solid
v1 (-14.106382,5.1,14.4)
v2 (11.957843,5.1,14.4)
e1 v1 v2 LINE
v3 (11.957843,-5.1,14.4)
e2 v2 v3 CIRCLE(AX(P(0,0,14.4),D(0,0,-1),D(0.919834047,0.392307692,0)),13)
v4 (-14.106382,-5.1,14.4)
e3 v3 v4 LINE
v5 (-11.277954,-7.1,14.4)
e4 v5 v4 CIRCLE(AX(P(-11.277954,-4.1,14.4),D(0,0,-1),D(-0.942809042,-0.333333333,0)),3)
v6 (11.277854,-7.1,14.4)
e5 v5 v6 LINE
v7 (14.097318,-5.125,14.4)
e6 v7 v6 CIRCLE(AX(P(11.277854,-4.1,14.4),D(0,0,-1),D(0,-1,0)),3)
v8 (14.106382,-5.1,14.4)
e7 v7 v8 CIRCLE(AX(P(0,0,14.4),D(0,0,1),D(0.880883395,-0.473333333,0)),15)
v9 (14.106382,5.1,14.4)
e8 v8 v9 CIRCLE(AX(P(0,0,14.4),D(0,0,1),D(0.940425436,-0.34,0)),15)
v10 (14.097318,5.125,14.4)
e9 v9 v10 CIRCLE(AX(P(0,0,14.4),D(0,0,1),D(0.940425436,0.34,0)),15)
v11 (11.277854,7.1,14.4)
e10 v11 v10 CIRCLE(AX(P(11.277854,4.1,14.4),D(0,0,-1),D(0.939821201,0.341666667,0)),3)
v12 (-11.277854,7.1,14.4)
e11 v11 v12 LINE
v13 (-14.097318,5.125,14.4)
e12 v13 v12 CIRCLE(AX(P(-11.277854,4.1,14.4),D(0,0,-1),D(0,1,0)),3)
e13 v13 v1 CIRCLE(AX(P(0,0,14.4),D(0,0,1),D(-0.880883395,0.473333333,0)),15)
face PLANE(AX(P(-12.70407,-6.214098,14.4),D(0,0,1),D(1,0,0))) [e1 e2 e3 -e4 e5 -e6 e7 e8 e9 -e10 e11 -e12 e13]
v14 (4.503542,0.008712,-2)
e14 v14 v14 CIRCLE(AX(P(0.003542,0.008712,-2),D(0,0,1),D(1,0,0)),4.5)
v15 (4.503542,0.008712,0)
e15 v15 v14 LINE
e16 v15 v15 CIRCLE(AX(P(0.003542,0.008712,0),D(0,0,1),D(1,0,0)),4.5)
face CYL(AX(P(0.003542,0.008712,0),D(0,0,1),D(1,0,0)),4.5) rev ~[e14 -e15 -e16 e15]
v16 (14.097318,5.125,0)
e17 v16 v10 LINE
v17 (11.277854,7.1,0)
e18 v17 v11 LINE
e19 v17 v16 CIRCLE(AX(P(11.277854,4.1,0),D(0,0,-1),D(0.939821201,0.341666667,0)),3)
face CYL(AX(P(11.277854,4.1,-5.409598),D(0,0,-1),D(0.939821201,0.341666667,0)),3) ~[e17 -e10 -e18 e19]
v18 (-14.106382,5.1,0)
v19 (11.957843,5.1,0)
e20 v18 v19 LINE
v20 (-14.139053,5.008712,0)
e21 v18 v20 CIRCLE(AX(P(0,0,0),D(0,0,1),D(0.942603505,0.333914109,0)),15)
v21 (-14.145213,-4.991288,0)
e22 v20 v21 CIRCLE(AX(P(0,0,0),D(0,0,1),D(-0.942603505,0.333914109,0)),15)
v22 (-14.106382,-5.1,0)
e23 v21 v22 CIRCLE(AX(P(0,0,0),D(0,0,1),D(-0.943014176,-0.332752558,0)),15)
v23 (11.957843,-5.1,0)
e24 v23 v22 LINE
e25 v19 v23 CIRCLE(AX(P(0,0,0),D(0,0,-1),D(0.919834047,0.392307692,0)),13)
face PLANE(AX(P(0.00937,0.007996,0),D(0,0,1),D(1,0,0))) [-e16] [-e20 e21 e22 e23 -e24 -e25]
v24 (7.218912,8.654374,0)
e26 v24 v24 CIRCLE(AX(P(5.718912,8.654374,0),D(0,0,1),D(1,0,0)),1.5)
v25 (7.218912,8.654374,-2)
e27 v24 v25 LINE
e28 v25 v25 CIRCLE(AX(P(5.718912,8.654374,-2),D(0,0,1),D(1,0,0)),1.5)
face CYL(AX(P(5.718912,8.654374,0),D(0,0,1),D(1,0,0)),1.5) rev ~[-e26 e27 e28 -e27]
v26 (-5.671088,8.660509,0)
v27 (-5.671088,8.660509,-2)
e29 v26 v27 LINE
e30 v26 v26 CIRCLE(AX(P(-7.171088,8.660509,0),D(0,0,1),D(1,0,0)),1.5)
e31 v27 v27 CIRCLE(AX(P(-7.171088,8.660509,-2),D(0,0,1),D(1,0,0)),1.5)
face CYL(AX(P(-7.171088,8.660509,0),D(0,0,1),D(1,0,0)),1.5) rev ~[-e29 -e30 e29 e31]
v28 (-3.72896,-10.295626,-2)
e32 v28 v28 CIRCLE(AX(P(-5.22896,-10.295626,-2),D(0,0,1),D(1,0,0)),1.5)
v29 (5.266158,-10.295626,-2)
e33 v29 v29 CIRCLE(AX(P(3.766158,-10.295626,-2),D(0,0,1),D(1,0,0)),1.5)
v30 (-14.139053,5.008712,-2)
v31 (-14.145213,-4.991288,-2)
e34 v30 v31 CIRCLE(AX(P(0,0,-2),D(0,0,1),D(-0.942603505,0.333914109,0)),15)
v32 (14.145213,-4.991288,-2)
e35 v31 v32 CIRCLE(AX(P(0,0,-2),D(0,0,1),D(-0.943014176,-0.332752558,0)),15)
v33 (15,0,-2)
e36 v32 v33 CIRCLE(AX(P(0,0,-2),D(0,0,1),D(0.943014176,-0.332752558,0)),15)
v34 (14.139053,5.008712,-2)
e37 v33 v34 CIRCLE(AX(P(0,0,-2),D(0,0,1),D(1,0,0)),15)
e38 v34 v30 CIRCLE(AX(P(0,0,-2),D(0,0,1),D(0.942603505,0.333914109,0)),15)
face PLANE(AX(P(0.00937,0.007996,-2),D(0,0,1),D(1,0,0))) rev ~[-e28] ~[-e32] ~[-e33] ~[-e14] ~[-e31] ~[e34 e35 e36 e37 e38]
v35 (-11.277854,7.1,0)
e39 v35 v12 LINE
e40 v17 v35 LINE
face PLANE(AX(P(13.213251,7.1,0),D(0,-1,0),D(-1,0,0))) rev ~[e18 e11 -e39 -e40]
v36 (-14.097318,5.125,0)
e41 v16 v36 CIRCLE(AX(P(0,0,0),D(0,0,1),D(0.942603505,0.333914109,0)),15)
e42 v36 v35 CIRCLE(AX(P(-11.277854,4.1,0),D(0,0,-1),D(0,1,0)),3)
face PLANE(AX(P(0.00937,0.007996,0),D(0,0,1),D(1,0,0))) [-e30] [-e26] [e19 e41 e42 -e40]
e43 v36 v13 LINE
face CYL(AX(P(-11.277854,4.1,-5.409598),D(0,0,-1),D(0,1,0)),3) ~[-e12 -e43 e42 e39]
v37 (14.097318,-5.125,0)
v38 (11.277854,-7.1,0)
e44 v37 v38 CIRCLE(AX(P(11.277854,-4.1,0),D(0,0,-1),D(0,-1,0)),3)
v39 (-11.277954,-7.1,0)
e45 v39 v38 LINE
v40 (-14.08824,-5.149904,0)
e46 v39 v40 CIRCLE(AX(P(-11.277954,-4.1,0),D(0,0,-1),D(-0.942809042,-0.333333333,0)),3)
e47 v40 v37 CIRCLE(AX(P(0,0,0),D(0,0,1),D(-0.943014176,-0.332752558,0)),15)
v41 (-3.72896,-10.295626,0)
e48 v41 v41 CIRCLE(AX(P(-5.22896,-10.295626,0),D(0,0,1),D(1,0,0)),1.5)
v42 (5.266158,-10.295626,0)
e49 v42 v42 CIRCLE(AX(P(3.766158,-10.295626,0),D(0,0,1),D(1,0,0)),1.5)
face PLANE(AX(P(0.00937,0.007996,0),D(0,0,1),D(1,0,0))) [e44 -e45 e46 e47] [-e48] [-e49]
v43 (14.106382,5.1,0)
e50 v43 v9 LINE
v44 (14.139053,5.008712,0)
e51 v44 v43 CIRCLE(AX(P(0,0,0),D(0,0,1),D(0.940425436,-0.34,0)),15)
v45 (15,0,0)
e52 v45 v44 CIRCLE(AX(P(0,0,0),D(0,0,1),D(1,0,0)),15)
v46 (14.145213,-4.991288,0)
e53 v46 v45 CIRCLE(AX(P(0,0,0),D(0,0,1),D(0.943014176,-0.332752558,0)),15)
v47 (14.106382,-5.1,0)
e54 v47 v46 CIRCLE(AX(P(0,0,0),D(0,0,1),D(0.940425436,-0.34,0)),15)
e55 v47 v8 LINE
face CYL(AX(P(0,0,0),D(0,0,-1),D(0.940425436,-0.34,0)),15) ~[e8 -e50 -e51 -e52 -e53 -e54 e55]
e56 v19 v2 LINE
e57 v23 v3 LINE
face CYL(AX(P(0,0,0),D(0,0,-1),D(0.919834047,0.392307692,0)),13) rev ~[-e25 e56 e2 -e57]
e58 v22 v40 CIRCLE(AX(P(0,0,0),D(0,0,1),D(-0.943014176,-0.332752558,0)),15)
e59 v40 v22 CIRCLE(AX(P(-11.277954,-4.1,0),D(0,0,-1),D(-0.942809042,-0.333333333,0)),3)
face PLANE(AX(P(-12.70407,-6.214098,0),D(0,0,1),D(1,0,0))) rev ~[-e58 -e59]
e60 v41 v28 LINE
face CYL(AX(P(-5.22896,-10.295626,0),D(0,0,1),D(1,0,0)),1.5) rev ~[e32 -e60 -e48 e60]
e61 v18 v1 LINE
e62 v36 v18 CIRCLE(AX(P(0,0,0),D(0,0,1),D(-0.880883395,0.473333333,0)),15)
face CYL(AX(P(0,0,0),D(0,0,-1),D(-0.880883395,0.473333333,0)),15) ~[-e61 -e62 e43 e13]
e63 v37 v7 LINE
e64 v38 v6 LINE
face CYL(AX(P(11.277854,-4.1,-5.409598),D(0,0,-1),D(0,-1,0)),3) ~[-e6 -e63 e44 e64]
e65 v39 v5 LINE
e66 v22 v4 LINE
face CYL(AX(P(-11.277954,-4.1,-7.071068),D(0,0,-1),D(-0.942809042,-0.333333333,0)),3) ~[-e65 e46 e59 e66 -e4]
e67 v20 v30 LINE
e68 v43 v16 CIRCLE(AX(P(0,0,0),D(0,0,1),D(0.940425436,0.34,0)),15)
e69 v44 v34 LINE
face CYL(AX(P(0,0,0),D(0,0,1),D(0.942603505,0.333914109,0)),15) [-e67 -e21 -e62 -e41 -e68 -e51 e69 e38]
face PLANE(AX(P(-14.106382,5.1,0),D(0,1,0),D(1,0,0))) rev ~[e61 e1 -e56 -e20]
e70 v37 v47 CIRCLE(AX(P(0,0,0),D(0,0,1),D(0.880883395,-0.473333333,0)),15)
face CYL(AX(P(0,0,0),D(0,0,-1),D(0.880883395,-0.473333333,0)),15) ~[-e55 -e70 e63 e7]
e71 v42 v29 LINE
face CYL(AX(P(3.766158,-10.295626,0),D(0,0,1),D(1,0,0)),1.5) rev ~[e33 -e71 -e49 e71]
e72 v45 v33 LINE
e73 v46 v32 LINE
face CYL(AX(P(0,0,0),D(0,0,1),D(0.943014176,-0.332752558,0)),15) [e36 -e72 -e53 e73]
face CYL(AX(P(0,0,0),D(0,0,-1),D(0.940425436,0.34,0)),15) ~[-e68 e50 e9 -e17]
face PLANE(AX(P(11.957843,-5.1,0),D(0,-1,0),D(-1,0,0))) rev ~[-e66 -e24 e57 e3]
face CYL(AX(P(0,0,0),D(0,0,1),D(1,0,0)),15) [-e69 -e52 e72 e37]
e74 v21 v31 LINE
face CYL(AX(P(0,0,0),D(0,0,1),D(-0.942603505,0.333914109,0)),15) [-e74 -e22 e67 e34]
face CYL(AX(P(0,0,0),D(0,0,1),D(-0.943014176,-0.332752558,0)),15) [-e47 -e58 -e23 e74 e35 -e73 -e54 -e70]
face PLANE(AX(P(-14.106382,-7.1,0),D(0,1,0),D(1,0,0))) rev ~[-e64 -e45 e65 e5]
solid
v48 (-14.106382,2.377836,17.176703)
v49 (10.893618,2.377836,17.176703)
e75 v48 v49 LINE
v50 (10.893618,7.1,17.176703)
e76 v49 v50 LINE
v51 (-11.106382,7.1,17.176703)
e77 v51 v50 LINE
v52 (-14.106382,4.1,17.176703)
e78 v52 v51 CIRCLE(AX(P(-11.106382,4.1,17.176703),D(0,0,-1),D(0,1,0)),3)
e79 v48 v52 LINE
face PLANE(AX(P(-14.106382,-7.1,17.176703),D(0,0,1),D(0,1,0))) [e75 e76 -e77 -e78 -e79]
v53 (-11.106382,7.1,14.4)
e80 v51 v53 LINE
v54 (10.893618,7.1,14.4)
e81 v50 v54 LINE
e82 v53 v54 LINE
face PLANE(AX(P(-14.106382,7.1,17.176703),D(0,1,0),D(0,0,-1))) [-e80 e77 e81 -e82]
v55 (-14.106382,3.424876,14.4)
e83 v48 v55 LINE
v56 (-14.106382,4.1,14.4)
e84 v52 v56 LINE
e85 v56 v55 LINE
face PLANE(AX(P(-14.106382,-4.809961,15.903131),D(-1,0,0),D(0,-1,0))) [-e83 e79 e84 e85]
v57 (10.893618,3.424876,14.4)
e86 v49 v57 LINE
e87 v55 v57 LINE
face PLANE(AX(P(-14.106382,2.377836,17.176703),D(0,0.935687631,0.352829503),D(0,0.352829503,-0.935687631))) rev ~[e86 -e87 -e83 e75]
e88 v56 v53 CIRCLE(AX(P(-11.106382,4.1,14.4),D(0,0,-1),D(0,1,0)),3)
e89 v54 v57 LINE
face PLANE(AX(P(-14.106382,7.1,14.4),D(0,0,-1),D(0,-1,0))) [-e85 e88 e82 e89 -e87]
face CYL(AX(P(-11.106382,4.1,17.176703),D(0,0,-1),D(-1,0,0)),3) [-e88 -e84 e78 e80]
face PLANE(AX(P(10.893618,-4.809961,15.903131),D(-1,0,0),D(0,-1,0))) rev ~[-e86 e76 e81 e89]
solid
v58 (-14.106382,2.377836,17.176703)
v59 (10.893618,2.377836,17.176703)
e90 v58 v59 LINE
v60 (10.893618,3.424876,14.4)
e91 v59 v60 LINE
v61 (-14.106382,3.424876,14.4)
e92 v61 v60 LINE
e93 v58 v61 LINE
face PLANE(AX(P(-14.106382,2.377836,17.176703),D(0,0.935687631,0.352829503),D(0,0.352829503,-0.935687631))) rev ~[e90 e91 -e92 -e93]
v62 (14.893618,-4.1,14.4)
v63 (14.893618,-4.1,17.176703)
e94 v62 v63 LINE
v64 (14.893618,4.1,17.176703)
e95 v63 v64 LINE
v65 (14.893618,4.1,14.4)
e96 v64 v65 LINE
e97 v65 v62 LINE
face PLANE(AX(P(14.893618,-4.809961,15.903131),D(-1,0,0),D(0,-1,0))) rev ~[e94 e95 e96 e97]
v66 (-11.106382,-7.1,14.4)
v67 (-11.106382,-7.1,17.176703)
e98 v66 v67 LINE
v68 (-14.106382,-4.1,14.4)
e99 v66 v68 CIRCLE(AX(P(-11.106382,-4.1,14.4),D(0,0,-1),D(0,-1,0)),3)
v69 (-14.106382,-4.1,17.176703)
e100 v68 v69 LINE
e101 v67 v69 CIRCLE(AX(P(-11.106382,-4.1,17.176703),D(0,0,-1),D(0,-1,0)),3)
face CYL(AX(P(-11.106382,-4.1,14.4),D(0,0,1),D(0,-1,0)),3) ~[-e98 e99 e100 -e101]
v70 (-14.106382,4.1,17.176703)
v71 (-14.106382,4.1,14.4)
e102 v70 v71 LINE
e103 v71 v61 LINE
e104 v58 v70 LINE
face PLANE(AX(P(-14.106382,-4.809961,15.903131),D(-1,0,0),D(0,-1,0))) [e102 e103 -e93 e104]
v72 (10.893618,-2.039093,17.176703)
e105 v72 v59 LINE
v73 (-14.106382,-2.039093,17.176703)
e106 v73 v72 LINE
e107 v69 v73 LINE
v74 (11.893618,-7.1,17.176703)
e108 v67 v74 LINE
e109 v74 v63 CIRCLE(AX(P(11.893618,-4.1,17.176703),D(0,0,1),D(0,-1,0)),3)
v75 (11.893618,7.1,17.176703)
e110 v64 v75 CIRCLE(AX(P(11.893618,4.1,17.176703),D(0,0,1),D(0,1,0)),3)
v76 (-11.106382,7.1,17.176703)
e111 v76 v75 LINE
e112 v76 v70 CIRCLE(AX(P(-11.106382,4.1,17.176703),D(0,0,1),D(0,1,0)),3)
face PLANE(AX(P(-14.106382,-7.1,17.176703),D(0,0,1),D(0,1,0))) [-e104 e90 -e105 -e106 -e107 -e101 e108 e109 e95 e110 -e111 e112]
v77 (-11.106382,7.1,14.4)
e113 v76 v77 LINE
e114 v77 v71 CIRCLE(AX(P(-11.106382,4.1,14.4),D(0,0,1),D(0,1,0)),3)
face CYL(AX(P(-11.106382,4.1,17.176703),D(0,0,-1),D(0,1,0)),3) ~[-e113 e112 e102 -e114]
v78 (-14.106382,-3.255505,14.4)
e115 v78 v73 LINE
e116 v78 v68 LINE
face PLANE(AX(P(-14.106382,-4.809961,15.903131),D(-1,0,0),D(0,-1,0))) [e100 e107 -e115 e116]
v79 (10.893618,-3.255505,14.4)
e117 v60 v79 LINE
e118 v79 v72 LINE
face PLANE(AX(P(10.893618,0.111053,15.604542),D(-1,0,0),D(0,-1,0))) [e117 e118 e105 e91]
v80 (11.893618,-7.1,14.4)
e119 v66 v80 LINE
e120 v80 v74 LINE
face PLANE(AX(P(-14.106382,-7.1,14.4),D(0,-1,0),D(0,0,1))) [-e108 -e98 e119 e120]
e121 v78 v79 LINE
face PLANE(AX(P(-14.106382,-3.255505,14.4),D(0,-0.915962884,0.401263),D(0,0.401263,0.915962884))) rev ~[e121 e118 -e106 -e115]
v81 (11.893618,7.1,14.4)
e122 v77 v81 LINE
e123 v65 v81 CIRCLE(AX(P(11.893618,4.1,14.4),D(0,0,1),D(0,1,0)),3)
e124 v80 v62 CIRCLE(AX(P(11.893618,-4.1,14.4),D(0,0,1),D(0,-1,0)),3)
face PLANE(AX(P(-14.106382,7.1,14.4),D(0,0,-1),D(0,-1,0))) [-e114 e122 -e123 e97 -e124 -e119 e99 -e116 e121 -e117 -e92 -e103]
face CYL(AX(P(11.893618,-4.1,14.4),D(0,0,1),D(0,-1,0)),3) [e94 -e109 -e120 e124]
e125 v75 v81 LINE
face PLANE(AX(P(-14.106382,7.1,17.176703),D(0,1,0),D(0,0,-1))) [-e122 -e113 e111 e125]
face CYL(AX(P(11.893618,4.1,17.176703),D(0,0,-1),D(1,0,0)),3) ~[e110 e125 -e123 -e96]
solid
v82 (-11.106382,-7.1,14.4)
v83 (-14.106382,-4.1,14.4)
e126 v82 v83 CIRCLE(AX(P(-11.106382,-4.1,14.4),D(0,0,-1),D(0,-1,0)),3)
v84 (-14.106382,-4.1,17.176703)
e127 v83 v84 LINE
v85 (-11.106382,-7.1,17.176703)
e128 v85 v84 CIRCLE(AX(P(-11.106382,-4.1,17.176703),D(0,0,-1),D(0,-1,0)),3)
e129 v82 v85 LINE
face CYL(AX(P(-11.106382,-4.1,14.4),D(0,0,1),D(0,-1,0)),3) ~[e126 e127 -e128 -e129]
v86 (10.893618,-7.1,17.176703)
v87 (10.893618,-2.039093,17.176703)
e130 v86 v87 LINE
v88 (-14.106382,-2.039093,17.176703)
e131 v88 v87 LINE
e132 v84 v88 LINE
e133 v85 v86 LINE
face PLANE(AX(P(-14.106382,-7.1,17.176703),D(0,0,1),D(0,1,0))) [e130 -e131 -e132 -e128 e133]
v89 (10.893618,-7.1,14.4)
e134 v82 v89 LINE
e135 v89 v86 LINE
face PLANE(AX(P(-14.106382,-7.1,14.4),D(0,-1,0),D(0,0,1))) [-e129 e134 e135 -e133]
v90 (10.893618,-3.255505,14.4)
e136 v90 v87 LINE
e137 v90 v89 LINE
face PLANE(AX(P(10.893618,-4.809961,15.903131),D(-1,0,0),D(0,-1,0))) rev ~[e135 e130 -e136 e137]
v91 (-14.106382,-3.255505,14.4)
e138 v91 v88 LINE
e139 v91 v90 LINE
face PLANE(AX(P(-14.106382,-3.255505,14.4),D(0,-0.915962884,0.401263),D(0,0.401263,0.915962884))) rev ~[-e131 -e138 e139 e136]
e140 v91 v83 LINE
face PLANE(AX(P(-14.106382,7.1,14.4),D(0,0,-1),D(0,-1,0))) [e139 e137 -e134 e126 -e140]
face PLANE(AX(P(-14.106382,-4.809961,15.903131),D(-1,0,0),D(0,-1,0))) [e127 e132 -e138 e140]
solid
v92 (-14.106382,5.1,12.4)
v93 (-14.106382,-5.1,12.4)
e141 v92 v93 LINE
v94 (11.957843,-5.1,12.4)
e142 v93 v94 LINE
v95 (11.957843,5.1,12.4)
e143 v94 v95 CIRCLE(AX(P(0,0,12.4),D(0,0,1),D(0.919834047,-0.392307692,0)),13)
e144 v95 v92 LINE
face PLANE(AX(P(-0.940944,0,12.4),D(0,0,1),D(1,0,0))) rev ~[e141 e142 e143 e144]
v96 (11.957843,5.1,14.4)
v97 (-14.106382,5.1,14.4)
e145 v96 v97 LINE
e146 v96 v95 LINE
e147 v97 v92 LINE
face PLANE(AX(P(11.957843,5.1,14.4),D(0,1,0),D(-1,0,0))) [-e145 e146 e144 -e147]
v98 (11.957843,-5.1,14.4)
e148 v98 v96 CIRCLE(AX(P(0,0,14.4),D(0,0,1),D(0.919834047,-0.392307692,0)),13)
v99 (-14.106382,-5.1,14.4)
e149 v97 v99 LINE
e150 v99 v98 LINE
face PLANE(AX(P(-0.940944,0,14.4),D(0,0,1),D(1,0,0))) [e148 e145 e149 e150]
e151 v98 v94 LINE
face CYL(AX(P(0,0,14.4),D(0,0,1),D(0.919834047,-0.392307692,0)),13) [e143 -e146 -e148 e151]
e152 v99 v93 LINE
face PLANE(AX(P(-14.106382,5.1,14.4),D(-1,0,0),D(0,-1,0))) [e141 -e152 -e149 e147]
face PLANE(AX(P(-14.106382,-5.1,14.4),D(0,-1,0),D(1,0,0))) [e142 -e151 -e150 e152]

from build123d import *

# Parameters (mm, degrees)
F1_DEPTH    = 14.4
F3_DEPTH    = 2
F5_DEPTH    = 29
F6_DEPTH    = 25
F7_DEPTH    = 25
F8_T1_DEPTH = 25.219195449
F8_T3_DEPTH = 28.5421356237
F8_2_F1_R   = 3
F8_2_F2_R   = 3
F8_2_F3_R   = 3
F8_2_F4_R   = 3
F9_R        = 3
F10_R       = 4.5
F10_R_2     = 1.5
F11_DEPTH   = 2


# Not quite as in the source:
# - a fillet or chamfer that OpenCascade refuses, or shapes differently, is made with other operations: its cross-section is extruded or revolved along the edge and cut away or added
# - after a boolean that leaves OpenCascade's solid faulty, fix() repairs it


with BuildPart() as f1:
    # F0 (on Top) → F1 (new body)
    with BuildSketch(Plane.XY):
        with BuildLine():
            Line((-11.9578426148, -5.1), (-14.1063815346, -5.1))
            Line((-14.1063815346, -5.1), (-14.1063815346, -7.1))
            Line((-14.1063815346, -7.1), (-10.8899035808, -7.1))
            ThreePointArc((-10.8899035808, -7.1), (-11.4675575671, -6.123326175), (-11.9578426148, -5.1))
        make_face()
        with BuildLine():
            Line((14.1063815346, -5.1), (11.9578426148, -5.1))
            ThreePointArc((11.9578426148, -5.1), (11.4675575671, -6.123326175), (10.8899035808, -7.1))
            Line((10.8899035808, -7.1), (13.2132509247, -7.1))
            ThreePointArc((13.2132509247, -7.1), (13.6963710314, -6.1163241062), (14.1063815346, -5.1))
        make_face()
        with BuildLine():
            Line((-10.8899035808, 7.1), (-13.2132509247, 7.1))
            ThreePointArc((-13.2132509247, 7.1), (-13.6963710314, 6.1163241062), (-14.1063815346, 5.1))
            Line((-14.1063815346, 5.1), (-11.9578426148, 5.1))
            ThreePointArc((-11.9578426148, 5.1), (-11.4675575671, 6.123326175), (-10.8899035808, 7.1))
        make_face()
        with BuildLine():
            Line((13.2132509247, 7.1), (10.8899035808, 7.1))
            ThreePointArc((10.8899035808, 7.1), (11.4675575671, 6.123326175), (11.9578426148, 5.1))
            Line((11.9578426148, 5.1), (14.1063815346, 5.1))
            ThreePointArc((14.1063815346, 5.1), (13.6963710314, 6.1163241062), (13.2132509247, 7.1))
        make_face()
        with BuildLine():
            Line((11.9578426148, -5.1), (-11.9578426148, -5.1))
            ThreePointArc((-11.9578426148, -5.1), (-11.4675575671, -6.123326175), (-10.8899035808, -7.1))
            Line((-10.8899035808, -7.1), (10.8899035808, -7.1))
            ThreePointArc((10.8899035808, -7.1), (11.4675575671, -6.123326175), (11.9578426148, -5.1))
        make_face()
        with BuildLine():
            Line((14.1063815346, 5.1), (11.9578426148, 5.1))
            ThreePointArc((11.9578426148, 5.1), (13, 0), (11.9578426148, -5.1))
            Line((11.9578426148, -5.1), (14.1063815346, -5.1))
            ThreePointArc((14.1063815346, -5.1), (15, 0), (14.1063815346, 5.1))
        make_face()
        with BuildLine():
            Line((10.8899035808, 7.1), (-10.8899035808, 7.1))
            ThreePointArc((-10.8899035808, 7.1), (-11.4675575671, 6.123326175), (-11.9578426148, 5.1))
            Line((-11.9578426148, 5.1), (11.9578426148, 5.1))
            ThreePointArc((11.9578426148, 5.1), (11.4675575671, 6.123326175), (10.8899035808, 7.1))
        make_face()
    extrude(amount=F1_DEPTH)

    # F8: fillet of radius 3 on 4 edges, made by hand

    # F8_s2 → F8_t1 (cut)
    with BuildSketch(Plane.XY.offset(-5.4095977245)):
        with BuildLine():
            ThreePointArc((14.0973180073, 5.125), (12.9990458537, 6.5571324751), (11.2778544059, 7.1))
            Line((11.2778544059, 7.1), (13.2132509247, 7.1))
            ThreePointArc((13.2132509247, 7.1), (13.6909440908, 6.1284622787), (14.0973180073, 5.125))
        make_face()
        with BuildLine():
            ThreePointArc((11.2778544059, -7.1), (12.9990458537, -6.5571324751), (14.0973180073, -5.125))
            ThreePointArc((14.0973180073, -5.125), (13.6909440908, -6.1284622787), (13.2132509247, -7.1))
            Line((13.2132509247, -7.1), (11.2778544059, -7.1))
        make_face()
        with BuildLine():
            ThreePointArc((-11.2778544059, 7.1), (-12.9990458537, 6.5571324751), (-14.0973180073, 5.125))
            ThreePointArc((-14.0973180073, 5.125), (-13.6909440908, 6.1284622787), (-13.2132509247, 7.1))
            Line((-13.2132509247, 7.1), (-11.2778544059, 7.1))
        make_face()
    extrude(amount=F8_T1_DEPTH, mode=Mode.SUBTRACT)

    # F8_s4 → F8_t3 (cut)
    with BuildSketch(Plane.XY.offset(-7.0710678119)):
        with BuildLine():
            ThreePointArc((-14.1063815346, -5.1), (-13.0100052174, -6.5494897428), (-11.2779544099, -7.1))
            Line((-11.2779544099, -7.1), (-14.1063815346, -7.1))
            Line((-14.1063815346, -7.1), (-14.1063815346, -5.1))
        make_face()
    extrude(amount=F8_T3_DEPTH, mode=Mode.SUBTRACT)

    # F10 (on Top) → F11 (join)
    with BuildSketch(Plane.XY):
        with BuildLine():
            ThreePointArc((14.1452126344, -4.9912883635), (14.7847588671, -2.5319765485), (15, 0))
            ThreePointArc((15, 0), (14.7831963499, 2.5410835644), (14.1390525758, 5.0087116365))
            Line((14.1390525758, 5.0087116365), (-14.1390525758, 5.0087116365))
            ThreePointArc((-14.1390525758, 5.0087116365), (-14.999997154, 0.0092400861), (-14.1452126344, -4.9912883635))
            Line((-14.1452126344, -4.9912883635), (14.1452126344, -4.9912883635))
        make_face()
        with Locations((0.0035419917, 0.0087116365)):
            Circle(F10_R, mode=Mode.SUBTRACT)
        with BuildLine():
            Line((-14.1390525758, 5.0087116365), (14.1390525758, 5.0087116365))
            ThreePointArc((14.1390525758, 5.0087116365), (0, 15), (-14.1390525758, 5.0087116365))
        make_face()
        with Locations((-7.1710880957, 8.6605090521)):
            Circle(F10_R_2, mode=Mode.SUBTRACT)
        with Locations((5.7189119043, 8.6543741425)):
            Circle(F10_R_2, mode=Mode.SUBTRACT)
        with BuildLine():
            ThreePointArc((-14.1452126344, -4.9912883635), (0, -15), (14.1452126344, -4.9912883635))
            Line((14.1452126344, -4.9912883635), (-14.1452126344, -4.9912883635))
        make_face()
        with Locations((-5.2289596802, -10.2956258575)):
            Circle(F10_R_2, mode=Mode.SUBTRACT)
        with Locations((3.7661575137, -10.2956258575)):
            Circle(F10_R_2, mode=Mode.SUBTRACT)
    extrude(amount=-F11_DEPTH)

    add(f1.part.fix(), mode=Mode.REPLACE)


with BuildPart() as f3:
    # F2 (on face) → F3 (new body)
    with BuildSketch(Plane.XY.offset(14.4)):
        with BuildLine():
            Line((-14.1063815346, 5.1), (-14.1063815346, -5.1))
            Line((-14.1063815346, -5.1), (11.9578426148, -5.1))
            ThreePointArc((11.9578426148, -5.1), (13, 0), (11.9578426148, 5.1))
            Line((11.9578426148, 5.1), (-14.1063815346, 5.1))
        make_face()
    extrude(amount=-F3_DEPTH)


with BuildPart() as f5:
    # F4 (on face) → F5 (new body)
    with BuildSketch(Plane(origin=(-14.1063815346, 0, 0), x_dir=(0, -1, 0), z_dir=(-1, 0, 0))):
        Polygon((5.1, 14.4), (5.4331574369, 14.4), (7.1, 14.4), (7.1, 17.1767032981), (2.039092524, 17.1767032981), (3.2555045802, 14.4), align=None)
        Polygon((-4.7668425631, 14.4), (-3.4248761367, 14.4), (-2.377835637, 17.1767032981), (-7.1, 17.1767032981), (-7.1, 14.4), (-5.1, 14.4), align=None)
        Polygon((-3.4248761367, 14.4), (3.2555045802, 14.4), (2.039092524, 17.1767032981), (-2.377835637, 17.1767032981), align=None)
    extrude(amount=-F5_DEPTH)


with BuildPart() as f6:
    # F4 (on face) → F6 (new body)
    with BuildSketch(Plane(origin=(-14.1063815346, 0, 0), x_dir=(0, -1, 0), z_dir=(-1, 0, 0))):
        Polygon((3.2555045802, 14.4), (5.4331574369, 14.4), (7.1, 14.4), (7.1, 17.1767032981), (2.039092524, 17.1767032981), align=None)
        Polygon((-3.4248761367, 14.4), (3.2555045802, 14.4), (2.039092524, 17.1767032981), (-2.377835637, 17.1767032981), align=None)
        Polygon((-4.7668425631, 14.4), (-3.4248761367, 14.4), (-2.377835637, 17.1767032981), (-7.1, 17.1767032981), (-7.1, 14.4), align=None)
    extrude(amount=-F6_DEPTH)


with BuildPart() as f7_tool:
    # F4 (on face) → F7 (new body)
    with BuildSketch(Plane(origin=(-14.1063815346, 0, 0), x_dir=(0, -1, 0), z_dir=(-1, 0, 0))):
        Polygon((-3.4248761367, 14.4), (3.2555045802, 14.4), (2.039092524, 17.1767032981), (-2.377835637, 17.1767032981), align=None)
    extrude(amount=-F7_DEPTH)


with BuildPart() as f5_1:
    add(f5.part)

    # F7: cut by f7_tool
    add(f7_tool.part, mode=Mode.SUBTRACT)

    # F8#2: fillet of radius 3 on 4 edges, made by hand

    # F8_2_f1
    f8_2_f1_edges = [f5_1.edges().sort_by_distance(p)[0] for p in [
        (-14.1063815346, -7.1, 15.788351649),
    ]]
    fillet(f8_2_f1_edges, radius=F8_2_F1_R)

    # F8_2_f2
    f8_2_f2_edges = [f5_1.edges().sort_by_distance(p)[0] for p in [
        (14.8936184654, -7.1, 15.788351649),
    ]]
    fillet(f8_2_f2_edges, radius=F8_2_F2_R)

    # F8_2_f3
    f8_2_f3_edges = [f5_1.edges().sort_by_distance(p)[0] for p in [
        (14.8936184654, 7.1, 15.788351649),
    ]]
    fillet(f8_2_f3_edges, radius=F8_2_F3_R)

    # F8_2_f4
    f8_2_f4_edges = [f5_1.edges().sort_by_distance(p)[0] for p in [
        (-14.1063815346, 7.1, 15.788351649),
    ]]
    fillet(f8_2_f4_edges, radius=F8_2_F4_R)


with BuildPart() as f6_1:
    add(f6.part)

    # F7: cut by f7_tool
    add(f7_tool.part, mode=Mode.SUBTRACT)

    # F9
    f9_edges = [f6_1.edges().sort_by_distance(p)[0] for p in [
        (-14.106382, 7.1, 15.788352),
        (-14.106382, -7.1, 15.788352),
    ]]
    fillet(f9_edges, radius=F9_R)


solid = Compound([f1.part, f3.part, f5_1.part, f6_1.part])
